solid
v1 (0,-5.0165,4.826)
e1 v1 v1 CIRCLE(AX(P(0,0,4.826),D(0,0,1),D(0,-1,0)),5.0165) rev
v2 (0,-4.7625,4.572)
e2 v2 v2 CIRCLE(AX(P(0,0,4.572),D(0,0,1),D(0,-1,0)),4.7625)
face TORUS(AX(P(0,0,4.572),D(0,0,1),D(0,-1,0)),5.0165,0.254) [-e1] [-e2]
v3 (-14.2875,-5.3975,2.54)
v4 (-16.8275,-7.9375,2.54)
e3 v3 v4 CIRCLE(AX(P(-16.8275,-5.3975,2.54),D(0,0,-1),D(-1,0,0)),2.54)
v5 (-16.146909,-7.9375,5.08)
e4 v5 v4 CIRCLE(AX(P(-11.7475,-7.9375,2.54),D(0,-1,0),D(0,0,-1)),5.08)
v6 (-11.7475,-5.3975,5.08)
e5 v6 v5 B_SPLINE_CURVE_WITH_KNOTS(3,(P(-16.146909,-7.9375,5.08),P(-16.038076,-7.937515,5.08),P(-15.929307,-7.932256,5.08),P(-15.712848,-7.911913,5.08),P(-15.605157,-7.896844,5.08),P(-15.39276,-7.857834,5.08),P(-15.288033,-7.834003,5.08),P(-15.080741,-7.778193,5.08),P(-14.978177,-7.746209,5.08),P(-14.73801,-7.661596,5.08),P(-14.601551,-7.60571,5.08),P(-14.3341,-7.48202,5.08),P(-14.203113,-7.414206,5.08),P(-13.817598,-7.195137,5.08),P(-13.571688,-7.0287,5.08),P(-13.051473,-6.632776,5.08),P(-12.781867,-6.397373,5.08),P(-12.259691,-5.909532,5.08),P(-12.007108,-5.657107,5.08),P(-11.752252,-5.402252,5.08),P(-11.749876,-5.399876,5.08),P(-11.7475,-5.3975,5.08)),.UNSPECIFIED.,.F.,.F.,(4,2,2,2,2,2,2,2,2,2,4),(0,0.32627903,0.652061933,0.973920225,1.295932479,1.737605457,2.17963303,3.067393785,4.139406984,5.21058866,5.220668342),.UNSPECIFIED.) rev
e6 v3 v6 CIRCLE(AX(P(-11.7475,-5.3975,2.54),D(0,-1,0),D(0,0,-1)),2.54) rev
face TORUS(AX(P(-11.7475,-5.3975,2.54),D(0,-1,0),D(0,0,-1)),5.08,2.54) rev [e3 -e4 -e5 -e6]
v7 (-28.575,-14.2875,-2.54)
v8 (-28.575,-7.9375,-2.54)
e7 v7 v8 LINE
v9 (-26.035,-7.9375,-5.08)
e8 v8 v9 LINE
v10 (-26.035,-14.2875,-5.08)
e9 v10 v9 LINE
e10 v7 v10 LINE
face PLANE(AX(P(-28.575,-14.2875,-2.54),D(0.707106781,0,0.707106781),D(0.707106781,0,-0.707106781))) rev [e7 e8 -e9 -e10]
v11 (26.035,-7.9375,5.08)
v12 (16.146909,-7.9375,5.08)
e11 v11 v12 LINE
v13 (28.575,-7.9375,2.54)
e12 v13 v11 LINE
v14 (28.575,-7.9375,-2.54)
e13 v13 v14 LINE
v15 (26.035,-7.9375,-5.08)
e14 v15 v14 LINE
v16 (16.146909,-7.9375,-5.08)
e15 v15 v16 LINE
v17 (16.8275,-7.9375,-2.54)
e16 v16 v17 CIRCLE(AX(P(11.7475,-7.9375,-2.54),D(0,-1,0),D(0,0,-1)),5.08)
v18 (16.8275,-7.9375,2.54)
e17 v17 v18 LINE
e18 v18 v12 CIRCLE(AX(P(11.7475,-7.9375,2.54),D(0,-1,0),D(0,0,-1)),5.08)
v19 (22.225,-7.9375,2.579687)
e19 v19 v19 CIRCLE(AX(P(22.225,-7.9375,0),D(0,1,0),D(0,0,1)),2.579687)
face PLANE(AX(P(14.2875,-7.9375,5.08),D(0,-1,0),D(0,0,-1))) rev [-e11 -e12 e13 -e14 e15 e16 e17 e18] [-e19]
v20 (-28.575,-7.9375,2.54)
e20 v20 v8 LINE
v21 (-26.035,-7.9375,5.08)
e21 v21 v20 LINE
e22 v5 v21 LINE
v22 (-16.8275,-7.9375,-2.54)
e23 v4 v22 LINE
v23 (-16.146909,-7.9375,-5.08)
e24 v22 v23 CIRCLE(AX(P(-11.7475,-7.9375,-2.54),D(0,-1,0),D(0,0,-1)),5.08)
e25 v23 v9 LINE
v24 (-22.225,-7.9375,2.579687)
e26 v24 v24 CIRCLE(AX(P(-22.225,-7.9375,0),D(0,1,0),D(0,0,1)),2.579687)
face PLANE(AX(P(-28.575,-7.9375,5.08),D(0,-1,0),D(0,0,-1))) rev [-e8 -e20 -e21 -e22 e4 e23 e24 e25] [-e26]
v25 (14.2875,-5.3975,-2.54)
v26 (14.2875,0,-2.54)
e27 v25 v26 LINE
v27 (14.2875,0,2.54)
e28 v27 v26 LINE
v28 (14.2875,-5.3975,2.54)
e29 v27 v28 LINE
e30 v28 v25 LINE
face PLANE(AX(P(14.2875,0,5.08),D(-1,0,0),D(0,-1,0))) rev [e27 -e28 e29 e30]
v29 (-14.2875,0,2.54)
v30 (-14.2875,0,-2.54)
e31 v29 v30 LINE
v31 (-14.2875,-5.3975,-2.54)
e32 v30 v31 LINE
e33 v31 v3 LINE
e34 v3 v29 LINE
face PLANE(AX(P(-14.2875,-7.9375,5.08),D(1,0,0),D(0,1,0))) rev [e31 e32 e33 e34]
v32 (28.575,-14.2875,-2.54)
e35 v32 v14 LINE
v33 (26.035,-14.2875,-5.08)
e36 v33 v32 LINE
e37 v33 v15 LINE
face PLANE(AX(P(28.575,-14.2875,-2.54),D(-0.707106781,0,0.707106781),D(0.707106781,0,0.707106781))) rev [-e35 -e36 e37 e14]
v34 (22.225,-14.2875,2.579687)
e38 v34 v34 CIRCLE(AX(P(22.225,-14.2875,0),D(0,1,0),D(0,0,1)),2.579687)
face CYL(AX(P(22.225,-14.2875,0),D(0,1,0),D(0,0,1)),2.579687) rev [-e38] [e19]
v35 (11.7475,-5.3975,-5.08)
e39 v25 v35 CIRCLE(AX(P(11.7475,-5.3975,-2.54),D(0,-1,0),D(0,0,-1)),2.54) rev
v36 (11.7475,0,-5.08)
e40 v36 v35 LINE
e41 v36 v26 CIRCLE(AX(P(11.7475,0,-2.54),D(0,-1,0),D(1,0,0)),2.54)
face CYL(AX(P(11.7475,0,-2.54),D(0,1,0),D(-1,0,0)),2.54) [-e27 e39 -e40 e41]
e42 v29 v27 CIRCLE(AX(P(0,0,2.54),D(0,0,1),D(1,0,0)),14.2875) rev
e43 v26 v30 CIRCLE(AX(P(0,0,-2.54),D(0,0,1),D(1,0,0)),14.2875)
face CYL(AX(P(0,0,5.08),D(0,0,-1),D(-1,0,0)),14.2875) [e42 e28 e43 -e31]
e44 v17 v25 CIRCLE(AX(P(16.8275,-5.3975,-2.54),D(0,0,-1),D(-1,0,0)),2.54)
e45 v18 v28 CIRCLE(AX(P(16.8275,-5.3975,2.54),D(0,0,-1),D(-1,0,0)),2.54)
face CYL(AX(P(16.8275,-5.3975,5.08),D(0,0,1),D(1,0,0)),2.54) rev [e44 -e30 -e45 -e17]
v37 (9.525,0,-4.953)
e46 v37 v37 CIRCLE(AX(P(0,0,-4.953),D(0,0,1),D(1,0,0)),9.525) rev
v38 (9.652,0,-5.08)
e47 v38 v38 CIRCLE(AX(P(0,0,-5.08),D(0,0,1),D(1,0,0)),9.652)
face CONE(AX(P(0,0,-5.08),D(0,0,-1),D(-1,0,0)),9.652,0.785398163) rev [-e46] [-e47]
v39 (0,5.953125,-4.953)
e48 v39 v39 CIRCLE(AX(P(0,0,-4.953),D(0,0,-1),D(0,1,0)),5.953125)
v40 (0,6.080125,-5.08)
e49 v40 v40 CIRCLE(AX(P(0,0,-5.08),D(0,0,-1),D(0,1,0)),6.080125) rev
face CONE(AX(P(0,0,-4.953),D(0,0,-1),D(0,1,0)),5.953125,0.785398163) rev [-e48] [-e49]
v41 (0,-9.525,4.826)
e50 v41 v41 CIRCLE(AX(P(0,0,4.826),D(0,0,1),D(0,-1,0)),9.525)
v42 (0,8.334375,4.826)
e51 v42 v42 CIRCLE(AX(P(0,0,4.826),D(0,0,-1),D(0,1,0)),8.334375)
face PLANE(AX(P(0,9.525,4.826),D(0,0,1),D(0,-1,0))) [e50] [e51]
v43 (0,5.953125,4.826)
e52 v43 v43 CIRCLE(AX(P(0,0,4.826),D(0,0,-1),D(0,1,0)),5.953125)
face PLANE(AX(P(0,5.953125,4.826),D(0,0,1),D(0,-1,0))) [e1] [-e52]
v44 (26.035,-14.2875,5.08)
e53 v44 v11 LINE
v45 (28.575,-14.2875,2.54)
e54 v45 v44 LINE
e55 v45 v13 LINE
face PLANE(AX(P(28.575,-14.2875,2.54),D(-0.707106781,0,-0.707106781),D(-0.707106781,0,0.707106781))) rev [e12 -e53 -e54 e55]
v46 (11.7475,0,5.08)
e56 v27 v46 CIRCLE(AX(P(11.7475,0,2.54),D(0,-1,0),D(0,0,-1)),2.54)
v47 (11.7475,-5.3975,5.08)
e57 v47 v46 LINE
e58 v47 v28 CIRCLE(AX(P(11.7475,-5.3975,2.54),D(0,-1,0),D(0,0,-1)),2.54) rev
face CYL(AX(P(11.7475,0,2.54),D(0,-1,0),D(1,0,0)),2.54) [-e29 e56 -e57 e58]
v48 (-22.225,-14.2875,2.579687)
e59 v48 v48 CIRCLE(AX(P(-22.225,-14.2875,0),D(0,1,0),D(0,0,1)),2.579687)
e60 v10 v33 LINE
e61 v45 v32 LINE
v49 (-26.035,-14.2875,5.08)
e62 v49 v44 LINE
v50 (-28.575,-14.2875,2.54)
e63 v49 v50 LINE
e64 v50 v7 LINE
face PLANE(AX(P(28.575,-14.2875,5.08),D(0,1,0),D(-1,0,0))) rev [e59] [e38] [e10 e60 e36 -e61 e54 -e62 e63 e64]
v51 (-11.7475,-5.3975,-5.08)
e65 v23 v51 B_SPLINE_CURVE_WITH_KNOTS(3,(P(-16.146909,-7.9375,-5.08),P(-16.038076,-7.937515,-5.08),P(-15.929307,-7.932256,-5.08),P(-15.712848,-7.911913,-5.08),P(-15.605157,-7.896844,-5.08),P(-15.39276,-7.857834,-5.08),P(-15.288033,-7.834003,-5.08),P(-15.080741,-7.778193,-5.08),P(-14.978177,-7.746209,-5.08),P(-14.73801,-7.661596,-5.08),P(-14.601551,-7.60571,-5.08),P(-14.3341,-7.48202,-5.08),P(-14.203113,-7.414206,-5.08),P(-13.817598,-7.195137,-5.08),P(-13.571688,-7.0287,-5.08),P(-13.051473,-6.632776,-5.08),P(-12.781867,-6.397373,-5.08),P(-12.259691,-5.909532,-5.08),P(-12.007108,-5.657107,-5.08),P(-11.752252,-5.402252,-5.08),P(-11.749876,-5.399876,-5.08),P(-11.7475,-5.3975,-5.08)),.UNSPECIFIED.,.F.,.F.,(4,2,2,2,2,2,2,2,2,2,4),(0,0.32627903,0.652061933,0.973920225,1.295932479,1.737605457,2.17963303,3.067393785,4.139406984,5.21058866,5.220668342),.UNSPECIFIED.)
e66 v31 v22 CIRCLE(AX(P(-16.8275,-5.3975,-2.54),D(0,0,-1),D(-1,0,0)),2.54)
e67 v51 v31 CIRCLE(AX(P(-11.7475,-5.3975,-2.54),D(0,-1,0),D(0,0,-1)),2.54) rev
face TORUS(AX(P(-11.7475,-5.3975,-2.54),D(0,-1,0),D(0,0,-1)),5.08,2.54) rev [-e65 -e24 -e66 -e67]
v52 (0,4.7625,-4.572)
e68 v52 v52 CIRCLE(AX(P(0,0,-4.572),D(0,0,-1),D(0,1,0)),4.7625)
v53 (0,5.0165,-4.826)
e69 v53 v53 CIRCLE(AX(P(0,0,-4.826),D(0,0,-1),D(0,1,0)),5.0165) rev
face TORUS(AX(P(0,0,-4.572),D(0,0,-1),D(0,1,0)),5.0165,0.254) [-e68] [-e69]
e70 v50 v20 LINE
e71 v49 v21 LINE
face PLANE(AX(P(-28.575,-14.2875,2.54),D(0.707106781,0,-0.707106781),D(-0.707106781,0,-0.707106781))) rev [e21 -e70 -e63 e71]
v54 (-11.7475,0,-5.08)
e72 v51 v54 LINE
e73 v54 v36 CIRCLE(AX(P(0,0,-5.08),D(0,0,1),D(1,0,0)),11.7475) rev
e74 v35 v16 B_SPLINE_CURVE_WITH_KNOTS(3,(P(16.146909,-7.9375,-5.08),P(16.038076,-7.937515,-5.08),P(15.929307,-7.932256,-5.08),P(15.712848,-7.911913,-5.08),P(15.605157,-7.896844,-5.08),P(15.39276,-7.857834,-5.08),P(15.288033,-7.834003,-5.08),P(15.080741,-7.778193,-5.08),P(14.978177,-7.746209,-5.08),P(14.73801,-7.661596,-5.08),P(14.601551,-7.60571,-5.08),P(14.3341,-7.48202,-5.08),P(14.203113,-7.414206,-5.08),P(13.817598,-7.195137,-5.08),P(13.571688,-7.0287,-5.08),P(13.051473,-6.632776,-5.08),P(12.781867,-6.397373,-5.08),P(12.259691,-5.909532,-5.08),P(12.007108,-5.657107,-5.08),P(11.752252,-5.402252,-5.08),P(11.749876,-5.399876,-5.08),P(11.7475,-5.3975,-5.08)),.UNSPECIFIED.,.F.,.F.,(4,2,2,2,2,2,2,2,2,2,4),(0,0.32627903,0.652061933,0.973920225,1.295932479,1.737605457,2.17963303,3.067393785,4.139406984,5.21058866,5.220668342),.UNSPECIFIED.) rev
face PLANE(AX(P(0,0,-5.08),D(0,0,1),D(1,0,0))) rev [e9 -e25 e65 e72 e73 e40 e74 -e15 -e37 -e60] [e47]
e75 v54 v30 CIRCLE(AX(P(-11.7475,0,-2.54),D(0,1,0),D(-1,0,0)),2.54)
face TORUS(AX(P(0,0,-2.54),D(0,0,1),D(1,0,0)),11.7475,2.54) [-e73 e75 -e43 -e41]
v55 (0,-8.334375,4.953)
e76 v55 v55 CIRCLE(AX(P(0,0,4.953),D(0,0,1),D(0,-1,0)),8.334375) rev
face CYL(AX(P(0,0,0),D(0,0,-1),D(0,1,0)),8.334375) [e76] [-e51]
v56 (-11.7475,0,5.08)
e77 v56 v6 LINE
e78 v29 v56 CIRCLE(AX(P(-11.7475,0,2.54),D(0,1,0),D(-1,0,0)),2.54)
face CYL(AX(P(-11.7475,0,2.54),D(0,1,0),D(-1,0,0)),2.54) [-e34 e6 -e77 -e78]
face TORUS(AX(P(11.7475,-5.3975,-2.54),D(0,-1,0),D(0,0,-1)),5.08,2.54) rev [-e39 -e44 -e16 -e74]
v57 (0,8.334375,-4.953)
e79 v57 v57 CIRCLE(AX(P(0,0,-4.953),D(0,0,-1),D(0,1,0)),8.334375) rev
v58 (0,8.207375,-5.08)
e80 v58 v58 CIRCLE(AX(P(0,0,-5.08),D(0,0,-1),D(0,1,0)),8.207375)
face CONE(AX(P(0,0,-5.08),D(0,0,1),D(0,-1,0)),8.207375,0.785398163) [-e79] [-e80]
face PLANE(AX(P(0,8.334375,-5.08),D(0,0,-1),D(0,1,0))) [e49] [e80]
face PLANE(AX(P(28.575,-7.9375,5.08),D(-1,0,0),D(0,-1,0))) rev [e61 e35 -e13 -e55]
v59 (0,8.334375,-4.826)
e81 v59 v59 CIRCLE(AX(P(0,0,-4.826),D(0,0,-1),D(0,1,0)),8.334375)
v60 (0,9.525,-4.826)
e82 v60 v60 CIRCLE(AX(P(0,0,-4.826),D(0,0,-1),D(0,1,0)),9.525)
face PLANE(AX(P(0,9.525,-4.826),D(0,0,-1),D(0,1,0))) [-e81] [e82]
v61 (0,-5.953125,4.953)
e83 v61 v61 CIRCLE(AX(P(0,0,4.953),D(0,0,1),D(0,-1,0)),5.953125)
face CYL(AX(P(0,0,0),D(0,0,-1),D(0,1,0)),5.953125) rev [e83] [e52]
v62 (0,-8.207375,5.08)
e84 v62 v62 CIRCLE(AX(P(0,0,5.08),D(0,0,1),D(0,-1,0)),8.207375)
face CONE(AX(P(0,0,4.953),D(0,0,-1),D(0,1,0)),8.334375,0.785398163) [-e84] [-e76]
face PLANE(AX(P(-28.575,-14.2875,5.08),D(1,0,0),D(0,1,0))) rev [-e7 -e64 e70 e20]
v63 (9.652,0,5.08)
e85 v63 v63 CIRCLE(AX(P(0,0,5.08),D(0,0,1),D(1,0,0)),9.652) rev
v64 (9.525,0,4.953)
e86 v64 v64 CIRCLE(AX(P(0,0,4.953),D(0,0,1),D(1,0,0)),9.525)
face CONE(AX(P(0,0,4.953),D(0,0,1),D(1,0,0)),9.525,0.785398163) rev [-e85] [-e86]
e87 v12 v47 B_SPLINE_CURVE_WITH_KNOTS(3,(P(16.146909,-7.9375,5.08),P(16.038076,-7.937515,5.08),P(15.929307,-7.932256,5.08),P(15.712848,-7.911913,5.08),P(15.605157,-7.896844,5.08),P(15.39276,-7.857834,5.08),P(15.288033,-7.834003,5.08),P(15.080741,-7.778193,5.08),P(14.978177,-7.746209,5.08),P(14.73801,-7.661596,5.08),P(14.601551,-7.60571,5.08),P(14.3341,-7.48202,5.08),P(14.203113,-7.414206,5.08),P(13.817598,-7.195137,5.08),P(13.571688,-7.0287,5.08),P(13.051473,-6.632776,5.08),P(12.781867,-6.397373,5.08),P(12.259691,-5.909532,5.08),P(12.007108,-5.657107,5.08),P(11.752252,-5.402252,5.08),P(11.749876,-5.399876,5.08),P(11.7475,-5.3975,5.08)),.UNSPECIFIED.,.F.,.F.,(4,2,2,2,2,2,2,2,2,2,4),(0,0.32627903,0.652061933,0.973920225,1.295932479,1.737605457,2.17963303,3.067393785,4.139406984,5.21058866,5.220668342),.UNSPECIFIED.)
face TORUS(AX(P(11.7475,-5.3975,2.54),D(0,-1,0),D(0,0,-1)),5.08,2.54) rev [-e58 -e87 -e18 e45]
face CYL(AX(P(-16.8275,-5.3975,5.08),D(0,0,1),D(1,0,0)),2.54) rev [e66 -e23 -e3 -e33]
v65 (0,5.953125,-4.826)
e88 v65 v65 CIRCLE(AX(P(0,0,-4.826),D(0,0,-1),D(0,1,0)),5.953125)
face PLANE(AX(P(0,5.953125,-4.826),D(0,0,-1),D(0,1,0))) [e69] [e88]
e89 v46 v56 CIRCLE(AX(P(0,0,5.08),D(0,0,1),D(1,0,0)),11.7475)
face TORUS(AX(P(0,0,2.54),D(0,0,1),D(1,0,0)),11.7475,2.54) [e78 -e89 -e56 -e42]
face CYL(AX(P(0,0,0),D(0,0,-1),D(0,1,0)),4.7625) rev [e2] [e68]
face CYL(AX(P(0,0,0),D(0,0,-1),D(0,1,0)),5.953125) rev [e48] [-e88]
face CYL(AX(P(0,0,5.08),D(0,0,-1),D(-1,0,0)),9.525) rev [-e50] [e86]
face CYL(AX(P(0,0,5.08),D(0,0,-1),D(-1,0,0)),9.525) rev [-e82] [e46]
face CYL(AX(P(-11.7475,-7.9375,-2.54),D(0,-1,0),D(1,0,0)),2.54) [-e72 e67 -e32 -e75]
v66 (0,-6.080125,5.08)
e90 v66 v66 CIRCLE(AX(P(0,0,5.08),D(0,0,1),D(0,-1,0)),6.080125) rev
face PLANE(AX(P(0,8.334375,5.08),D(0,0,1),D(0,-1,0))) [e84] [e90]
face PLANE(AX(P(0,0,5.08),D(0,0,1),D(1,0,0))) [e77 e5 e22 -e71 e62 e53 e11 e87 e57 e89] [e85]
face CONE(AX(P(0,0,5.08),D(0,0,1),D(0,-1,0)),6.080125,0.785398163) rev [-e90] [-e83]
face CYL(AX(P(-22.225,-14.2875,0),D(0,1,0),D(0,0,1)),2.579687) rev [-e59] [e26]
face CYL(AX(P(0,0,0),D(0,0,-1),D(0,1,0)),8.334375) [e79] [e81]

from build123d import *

# Parameters (mm, degrees)
EXTRUDE1_DEPTH      = 5.08
EXTRUDE1_DEPTH_BACK = 5.08
SKETCH3_R           = 9.525
SKETCH4_R           = 2.5796875
CUT_EXTRUDE1_DEPTH  = 37.55526843
FILLET1_R           = 2.54
FILLET2_R           = 2.54
CHAMFER1_SIZE       = 0.127
FILLET3_R           = 0.254
CHAMFER2_SIZE       = 0.127


with BuildPart() as part:
    # Sketch3 → Extrude1 (new, two sides: drawn at the far end of the back side and taken through both)
    with BuildSketch(Plane.XY.offset(-EXTRUDE1_DEPTH_BACK)):
        with BuildLine():
            Line((14.2875, 0), (14.2875, -7.9375))
            Line((14.2875, -7.9375), (28.575, -7.9375))
            Line((28.575, -7.9375), (28.575, -14.2875))
            Line((28.575, -14.2875), (-28.575, -14.2875))
            Line((-28.575, -14.2875), (-28.575, -7.9375))
            Line((-28.575, -7.9375), (-14.2875, -7.9375))
            Line((-14.2875, -7.9375), (-14.2875, 0))
            ThreePointArc((-14.2875, 0), (0, 14.2875), (14.2875, 0))
        make_face()
        Circle(SKETCH3_R, mode=Mode.SUBTRACT)
    extrude(amount=EXTRUDE1_DEPTH + EXTRUDE1_DEPTH_BACK)

    # Sketch4 → Cut-Extrude1 (cut, through all)
    with BuildSketch(Plane(origin=(0, -7.9375, 0), x_dir=(1, 0, 0), z_dir=(0, 1, 0))):
        with Locations(Location((-22.225, 0, 0), (0, 0, 270))):
            Circle(SKETCH4_R)
        with Locations(Location((22.225, 0, 0), (0, 0, 270))):
            Circle(SKETCH4_R)
        Polygon((-28.575, 5.08), (-28.575, 2.54), (-26.035, 5.08), align=None)
        Polygon((26.035, 5.08), (28.575, 5.08), (28.575, 2.54), align=None)
        Polygon((28.575, -5.08), (28.575, -2.54), (26.035, -5.08), align=None)
        Polygon((-26.035, -5.08), (-28.575, -5.08), (-28.575, -2.54), align=None)
    extrude(amount=-CUT_EXTRUDE1_DEPTH, mode=Mode.SUBTRACT)

    # Fillet1
    fillet1_edges = [part.edges().sort_by_distance(p)[0] for p in [
        (0, 14.2875, -5.08),
        (14.2875, -3.96875, -5.08),
        (14.2875, -3.96875, 5.08),
        (-14.2875, -3.96875, -5.08),
        (0, 14.2875, 5.08),
        (-14.2875, -3.96875, 5.08),
    ]]
    fillet(fillet1_edges, radius=FILLET1_R)

    # Fillet2
    # the kernel refuses this fillet: 2.54 mm, written as the material it adds along each edge
    with BuildSketch(Plane(origin=(-14.2875, -7.9375, -2.54), x_dir=(0, 1, 0), z_dir=(0, 0, 1)), Plane(origin=(14.2875, -7.9375, 2.54), x_dir=(0, 1, 0), z_dir=(0, 0, -1))) as fillet2_piece_1:
        with BuildLine():
            CenterArc((FILLET2_R, FILLET2_R), FILLET2_R, 180, 90)
            Line((0, FILLET2_R), (0, 0))
            Line((0, 0), (FILLET2_R, 0))
        make_face()
    extrude(amount=5.08)
    with BuildSketch(Plane(origin=(11.7475, -7.9375, -2.54), x_dir=(-0.5976672776328281, 0, 0.8017442392976479), z_dir=(0.8017442392976479, 0, 0.5976672776328281))) as fillet2_piece_2_section:
        with BuildLine():
            CenterArc((2.54 + FILLET2_R, -FILLET2_R), FILLET2_R, 90, 90)
            Line((2.54 + FILLET2_R, 0), (2.54, 0))
            Line((2.54, 0), (2.54, -FILLET2_R))
        make_face()
    fillet2_piece_2 = revolve(axis=Axis((11.7475, -7.9375, -2.54), (0, -1, 0)), revolution_arc=233.296989237, mode=Mode.PRIVATE)
    fillet2_piece_2 = split(fillet2_piece_2, bisect_by=Plane(origin=(13.652344814, -7.145963779, -5.08), z_dir=(0, 0, 1)), keep=Keep.TOP, mode=Mode.PRIVATE)
    add(fillet2_piece_2)
    with BuildSketch(Plane(origin=(-11.7475, -7.9375, -2.54), x_dir=(0.5976672776328252, 0, 0.8017442392976498), z_dir=(-0.8017442392976498, 0, 0.5976672776328252))) as fillet2_piece_3_section:
        with BuildLine():
            CenterArc((2.54 + FILLET2_R, FILLET2_R), FILLET2_R, 180, 90)
            Line((2.54, FILLET2_R), (2.54, 0))
            Line((2.54, 0), (2.54 + FILLET2_R, 0))
        make_face()
    fillet2_piece_3 = revolve(axis=Axis((-11.7475, -7.9375, -2.54), (0, 1, 0)), revolution_arc=233.296989237, mode=Mode.PRIVATE)
    fillet2_piece_3 = split(fillet2_piece_3, bisect_by=Plane(origin=(-13.652344909, -7.145964282, -5.08), z_dir=(0, 0, 1)), keep=Keep.TOP, mode=Mode.PRIVATE)
    add(fillet2_piece_3)
    with BuildSketch(Plane(origin=(11.7475, -7.9375, 2.54), x_dir=(1, 0, 0), z_dir=(0, 0, -1))) as fillet2_piece_4_section:
        with BuildLine():
            CenterArc((2.54 + FILLET2_R, -FILLET2_R), FILLET2_R, 90, 90)
            Line((2.54 + FILLET2_R, 0), (2.54, 0))
            Line((2.54, 0), (2.54, -FILLET2_R))
        make_face()
    fillet2_piece_4 = revolve(axis=Axis((11.7475, -7.9375, 2.54), (0, -1, 0)), revolution_arc=233.296989237, mode=Mode.PRIVATE)
    fillet2_piece_4 = split(fillet2_piece_4, bisect_by=Plane(origin=(13.65234485, -7.145963968, 5.08), z_dir=(0, 0, -1)), keep=Keep.TOP, mode=Mode.PRIVATE)
    add(fillet2_piece_4)
    with BuildSketch(Plane(origin=(-11.7475, -7.9375, 2.54), x_dir=(-1, 0, 0), z_dir=(0, 0, -1))) as fillet2_piece_5_section:
        with BuildLine():
            CenterArc((2.54 + FILLET2_R, FILLET2_R), FILLET2_R, 180, 90)
            Line((2.54, FILLET2_R), (2.54, 0))
            Line((2.54, 0), (2.54 + FILLET2_R, 0))
        make_face()
    fillet2_piece_5 = revolve(axis=Axis((-11.7475, -7.9375, 2.54), (0, 1, 0)), revolution_arc=233.296989237, mode=Mode.PRIVATE)
    fillet2_piece_5 = split(fillet2_piece_5, bisect_by=Plane(origin=(-14.845729139, -7.512557487, 5.08), z_dir=(0, 0, -1)), keep=Keep.TOP, mode=Mode.PRIVATE)
    add(fillet2_piece_5)

    # Chamfer1
    chamfer1_edges = [part.edges().sort_by_distance(p)[0] for p in [
        (-9.525, 0, 5.08),
        (-9.525, 0, -5.08),
    ]]
    chamfer(chamfer1_edges, length=CHAMFER1_SIZE)

    # Sketch5 → Revolve1 (revolve)
    with BuildSketch(Plane(origin=(0, 0, 0), x_dir=(0, 0, -1), z_dir=(1, 0, 0))):
        Polygon((-4.826, 9.525), (-4.826, 8.334375), (-5.08, 8.334375), (-5.08, 5.953125), (-4.826, 5.953125), (-4.826, 4.7625), (4.826, 4.7625), (4.826, 5.953125), (5.08, 5.953125), (5.08, 8.334375), (4.826, 8.334375), (4.826, 9.525), align=None)
    revolve(axis=Axis((0, 0, 0), (0, 0, 1)))

    # Fillet3
    fillet3_edges = [part.edges().sort_by_distance(p)[0] for p in [
        (0, -4.7625, -4.826),
        (0, -4.7625, 4.826),
    ]]
    fillet(fillet3_edges, radius=FILLET3_R)

    # Chamfer2
    chamfer2_edges = [part.edges().sort_by_distance(p)[0] for p in [
        (0, -8.334375, -5.08),
        (0, -5.953125, -5.08),
        (0, -5.953125, 5.08),
        (0, -8.334375, 5.08),
    ]]
    chamfer(chamfer2_edges, length=CHAMFER2_SIZE)


solid = part.part
